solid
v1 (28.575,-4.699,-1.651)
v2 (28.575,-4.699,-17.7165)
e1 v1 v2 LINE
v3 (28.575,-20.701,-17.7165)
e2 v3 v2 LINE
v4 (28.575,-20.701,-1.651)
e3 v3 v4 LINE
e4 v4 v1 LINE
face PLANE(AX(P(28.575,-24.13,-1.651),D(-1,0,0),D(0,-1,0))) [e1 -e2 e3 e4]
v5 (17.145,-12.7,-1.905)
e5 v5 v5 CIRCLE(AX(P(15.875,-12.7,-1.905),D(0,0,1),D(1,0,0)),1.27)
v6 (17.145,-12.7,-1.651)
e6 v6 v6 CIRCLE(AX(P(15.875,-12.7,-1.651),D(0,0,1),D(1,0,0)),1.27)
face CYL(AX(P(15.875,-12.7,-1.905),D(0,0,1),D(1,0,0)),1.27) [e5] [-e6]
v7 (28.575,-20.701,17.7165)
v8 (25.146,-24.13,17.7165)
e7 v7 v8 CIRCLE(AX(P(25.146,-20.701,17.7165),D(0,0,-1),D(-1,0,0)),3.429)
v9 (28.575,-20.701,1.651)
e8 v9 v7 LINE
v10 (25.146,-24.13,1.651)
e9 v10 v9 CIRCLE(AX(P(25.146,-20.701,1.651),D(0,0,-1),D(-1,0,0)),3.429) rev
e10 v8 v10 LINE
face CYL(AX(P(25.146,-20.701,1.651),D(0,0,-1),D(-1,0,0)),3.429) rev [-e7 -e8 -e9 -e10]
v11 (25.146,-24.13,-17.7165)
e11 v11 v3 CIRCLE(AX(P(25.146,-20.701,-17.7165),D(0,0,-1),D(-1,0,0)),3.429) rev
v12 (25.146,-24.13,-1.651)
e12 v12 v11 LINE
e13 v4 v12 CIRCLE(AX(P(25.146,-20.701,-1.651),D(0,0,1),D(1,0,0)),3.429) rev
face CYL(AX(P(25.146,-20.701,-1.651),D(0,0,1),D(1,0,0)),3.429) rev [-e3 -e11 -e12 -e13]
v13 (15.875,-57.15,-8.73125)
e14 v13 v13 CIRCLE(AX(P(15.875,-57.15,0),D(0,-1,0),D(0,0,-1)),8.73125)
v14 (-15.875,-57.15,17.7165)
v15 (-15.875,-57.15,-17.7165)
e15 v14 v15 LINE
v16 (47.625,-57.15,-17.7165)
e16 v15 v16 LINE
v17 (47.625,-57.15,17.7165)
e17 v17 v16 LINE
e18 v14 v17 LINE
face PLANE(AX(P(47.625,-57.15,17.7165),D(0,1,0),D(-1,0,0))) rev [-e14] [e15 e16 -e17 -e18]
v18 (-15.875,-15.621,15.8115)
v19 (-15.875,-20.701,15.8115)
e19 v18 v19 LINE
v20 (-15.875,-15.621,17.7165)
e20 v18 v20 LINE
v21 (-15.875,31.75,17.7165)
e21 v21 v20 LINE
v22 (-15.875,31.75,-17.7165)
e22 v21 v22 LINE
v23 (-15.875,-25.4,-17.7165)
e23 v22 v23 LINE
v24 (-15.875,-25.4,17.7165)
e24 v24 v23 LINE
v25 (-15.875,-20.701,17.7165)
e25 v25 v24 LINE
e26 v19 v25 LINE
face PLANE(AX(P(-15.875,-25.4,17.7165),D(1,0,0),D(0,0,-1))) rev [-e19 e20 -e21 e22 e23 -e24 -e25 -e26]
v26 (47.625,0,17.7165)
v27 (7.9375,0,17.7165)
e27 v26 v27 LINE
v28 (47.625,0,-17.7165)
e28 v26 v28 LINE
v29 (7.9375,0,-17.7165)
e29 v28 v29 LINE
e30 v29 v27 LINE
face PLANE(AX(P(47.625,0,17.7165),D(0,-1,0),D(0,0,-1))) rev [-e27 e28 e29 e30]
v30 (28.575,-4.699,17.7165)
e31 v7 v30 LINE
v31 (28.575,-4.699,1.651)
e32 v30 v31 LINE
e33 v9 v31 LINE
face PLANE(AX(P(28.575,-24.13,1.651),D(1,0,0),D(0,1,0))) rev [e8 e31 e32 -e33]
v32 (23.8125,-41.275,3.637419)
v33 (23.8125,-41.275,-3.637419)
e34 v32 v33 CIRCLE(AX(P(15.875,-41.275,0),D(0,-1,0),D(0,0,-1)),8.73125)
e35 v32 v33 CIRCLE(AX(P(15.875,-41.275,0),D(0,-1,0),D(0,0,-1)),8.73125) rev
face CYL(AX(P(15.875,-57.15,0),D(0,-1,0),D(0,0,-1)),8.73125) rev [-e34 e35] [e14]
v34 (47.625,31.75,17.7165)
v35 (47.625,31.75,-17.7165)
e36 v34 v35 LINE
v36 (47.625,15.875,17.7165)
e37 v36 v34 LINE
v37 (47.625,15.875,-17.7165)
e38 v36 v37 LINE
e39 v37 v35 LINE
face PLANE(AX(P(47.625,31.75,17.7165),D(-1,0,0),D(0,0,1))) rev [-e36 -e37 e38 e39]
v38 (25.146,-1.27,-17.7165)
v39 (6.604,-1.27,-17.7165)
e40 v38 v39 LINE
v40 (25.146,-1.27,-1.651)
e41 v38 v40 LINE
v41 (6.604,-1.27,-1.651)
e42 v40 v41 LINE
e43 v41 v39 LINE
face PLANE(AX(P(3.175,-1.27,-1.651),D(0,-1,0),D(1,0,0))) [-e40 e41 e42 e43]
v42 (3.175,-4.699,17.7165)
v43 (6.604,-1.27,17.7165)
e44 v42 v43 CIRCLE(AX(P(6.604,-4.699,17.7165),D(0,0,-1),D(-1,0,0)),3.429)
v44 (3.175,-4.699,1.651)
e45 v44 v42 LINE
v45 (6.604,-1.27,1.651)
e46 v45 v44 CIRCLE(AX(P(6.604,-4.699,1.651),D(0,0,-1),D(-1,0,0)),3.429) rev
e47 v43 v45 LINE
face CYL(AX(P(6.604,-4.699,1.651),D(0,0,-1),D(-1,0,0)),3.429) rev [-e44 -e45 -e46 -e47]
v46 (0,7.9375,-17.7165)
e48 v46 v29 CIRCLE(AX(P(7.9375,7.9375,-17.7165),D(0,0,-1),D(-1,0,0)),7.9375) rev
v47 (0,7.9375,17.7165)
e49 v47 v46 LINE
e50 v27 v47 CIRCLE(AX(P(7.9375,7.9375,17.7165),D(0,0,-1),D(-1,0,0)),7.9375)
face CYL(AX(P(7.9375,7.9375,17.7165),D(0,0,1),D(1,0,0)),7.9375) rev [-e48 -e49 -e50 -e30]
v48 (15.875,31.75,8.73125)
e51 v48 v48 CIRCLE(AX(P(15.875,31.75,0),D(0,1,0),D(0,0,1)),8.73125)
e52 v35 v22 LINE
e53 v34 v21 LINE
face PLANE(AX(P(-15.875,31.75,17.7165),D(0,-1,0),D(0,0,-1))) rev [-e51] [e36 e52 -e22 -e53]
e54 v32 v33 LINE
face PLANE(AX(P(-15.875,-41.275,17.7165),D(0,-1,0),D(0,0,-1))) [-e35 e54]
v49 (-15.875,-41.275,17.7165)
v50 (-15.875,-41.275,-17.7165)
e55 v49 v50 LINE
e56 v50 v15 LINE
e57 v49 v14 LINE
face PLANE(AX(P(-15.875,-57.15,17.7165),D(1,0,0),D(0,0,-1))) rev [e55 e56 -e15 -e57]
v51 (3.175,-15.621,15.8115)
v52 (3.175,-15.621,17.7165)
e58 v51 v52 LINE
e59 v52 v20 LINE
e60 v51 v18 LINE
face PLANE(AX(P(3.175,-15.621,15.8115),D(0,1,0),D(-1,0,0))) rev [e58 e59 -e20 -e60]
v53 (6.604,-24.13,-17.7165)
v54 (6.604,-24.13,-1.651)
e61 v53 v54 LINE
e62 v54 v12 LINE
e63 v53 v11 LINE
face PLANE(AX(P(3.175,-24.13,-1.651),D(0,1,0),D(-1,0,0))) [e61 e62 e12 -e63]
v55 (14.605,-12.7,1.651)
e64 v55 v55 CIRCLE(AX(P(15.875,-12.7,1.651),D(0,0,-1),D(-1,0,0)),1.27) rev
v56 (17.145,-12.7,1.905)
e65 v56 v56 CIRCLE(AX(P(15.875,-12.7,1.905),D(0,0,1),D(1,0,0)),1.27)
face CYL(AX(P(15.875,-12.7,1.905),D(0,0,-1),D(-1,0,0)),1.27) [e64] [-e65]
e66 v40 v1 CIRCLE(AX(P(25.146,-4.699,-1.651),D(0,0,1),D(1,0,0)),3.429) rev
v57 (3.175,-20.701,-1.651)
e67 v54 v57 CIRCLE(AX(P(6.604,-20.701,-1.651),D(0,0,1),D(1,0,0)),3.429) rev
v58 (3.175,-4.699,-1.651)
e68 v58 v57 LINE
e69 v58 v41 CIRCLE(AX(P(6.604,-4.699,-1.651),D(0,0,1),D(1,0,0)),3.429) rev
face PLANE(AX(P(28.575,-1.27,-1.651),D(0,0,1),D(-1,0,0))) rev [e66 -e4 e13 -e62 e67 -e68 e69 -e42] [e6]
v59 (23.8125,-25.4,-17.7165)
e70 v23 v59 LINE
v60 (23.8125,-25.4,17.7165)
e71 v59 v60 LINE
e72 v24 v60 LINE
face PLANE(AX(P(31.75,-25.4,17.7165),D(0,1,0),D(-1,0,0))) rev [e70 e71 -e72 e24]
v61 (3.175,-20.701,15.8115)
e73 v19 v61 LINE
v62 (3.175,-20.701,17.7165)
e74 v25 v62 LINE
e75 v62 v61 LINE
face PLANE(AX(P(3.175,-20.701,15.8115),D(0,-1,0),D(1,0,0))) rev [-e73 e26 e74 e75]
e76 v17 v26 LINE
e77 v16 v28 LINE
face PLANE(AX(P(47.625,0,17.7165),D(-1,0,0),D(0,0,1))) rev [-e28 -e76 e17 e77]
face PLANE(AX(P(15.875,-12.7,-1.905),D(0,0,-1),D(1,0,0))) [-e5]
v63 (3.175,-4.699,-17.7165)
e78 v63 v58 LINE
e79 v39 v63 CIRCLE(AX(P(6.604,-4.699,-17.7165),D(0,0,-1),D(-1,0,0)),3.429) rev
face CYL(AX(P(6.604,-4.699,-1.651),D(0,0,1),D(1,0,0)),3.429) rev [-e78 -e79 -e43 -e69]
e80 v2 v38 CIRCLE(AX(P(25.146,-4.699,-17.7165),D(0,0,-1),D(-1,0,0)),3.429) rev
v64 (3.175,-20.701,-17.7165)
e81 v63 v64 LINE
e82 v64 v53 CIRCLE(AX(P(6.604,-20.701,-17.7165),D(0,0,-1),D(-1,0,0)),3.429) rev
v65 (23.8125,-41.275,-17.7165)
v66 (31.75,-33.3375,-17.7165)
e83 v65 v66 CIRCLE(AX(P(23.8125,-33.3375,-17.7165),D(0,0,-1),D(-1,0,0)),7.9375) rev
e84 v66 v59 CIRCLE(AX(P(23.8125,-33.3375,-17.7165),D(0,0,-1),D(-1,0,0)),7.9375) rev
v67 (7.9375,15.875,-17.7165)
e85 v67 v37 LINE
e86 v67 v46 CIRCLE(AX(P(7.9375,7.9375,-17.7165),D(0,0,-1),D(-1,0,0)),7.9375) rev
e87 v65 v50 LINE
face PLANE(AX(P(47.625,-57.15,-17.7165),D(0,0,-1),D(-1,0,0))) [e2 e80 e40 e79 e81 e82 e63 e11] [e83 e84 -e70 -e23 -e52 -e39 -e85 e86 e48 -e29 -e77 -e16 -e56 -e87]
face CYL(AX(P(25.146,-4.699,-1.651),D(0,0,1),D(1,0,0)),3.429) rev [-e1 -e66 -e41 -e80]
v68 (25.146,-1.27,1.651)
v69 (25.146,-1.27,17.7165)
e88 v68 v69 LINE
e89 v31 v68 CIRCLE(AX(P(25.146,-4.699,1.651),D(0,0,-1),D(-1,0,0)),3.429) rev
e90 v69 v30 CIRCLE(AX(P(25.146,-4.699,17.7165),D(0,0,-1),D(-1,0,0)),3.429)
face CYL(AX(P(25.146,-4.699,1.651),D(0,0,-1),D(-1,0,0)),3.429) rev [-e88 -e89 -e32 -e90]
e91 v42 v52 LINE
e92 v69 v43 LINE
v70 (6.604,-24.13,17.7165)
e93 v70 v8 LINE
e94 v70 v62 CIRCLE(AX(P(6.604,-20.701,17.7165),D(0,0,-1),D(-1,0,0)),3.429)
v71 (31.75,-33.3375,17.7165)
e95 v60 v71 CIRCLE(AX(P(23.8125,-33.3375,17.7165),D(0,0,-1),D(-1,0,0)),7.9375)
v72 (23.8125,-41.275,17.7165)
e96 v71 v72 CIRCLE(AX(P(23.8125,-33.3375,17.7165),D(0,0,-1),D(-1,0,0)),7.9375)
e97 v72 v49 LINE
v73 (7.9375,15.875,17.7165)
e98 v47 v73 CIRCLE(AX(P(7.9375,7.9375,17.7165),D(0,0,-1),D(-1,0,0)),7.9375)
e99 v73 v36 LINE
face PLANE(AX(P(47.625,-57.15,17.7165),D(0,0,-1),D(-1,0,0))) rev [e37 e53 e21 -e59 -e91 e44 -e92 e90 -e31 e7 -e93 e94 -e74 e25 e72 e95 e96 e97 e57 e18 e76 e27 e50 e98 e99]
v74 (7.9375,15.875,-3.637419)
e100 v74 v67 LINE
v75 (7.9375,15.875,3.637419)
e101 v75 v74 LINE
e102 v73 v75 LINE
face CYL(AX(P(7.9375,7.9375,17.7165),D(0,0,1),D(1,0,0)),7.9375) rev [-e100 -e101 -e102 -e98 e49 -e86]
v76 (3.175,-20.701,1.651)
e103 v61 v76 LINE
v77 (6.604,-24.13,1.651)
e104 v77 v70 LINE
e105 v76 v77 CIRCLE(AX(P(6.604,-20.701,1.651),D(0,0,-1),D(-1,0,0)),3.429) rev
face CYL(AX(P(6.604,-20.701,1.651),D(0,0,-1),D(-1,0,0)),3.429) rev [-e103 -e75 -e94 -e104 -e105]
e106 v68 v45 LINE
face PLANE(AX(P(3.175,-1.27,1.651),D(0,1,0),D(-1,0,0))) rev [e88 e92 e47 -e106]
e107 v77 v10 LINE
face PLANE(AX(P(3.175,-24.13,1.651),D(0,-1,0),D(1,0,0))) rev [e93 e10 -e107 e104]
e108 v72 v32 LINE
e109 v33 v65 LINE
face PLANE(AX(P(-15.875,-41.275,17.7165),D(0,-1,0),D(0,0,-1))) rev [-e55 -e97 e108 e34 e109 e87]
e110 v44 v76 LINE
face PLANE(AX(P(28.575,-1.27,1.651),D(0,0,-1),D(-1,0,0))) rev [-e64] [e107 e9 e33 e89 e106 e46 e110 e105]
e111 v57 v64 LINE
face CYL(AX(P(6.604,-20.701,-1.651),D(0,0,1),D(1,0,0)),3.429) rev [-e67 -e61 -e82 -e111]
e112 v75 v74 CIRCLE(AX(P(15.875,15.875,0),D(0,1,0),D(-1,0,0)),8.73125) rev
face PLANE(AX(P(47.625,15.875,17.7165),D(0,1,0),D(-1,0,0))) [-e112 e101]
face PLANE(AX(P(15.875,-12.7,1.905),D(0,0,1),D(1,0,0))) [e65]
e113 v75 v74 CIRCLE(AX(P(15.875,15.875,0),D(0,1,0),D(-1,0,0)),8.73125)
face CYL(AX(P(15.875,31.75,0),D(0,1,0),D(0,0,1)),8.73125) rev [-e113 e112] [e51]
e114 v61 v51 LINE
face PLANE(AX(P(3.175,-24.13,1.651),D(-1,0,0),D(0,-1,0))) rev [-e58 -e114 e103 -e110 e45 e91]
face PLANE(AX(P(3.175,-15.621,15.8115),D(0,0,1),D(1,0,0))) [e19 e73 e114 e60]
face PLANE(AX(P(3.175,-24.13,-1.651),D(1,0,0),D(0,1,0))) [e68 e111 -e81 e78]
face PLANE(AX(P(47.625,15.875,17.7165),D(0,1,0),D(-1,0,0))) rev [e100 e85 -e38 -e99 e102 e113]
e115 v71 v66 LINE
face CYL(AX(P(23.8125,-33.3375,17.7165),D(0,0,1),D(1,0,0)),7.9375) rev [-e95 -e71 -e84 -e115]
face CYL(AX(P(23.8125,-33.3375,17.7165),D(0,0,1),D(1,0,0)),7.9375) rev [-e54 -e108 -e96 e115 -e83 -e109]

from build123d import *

# Parameters (mm, degrees)
BOSS_EXTRUDE1_DEPTH         = 17.7165
FILLET1_R                   = 7.9375
F_3_4_16_TAPPED_HOLE1_D     = 17.4625
F_3_4_16_TAPPED_HOLE1_DEPTH = 15.875
F_3_4_16_TAPPED_HOLE2_D     = 17.4625
F_3_4_16_TAPPED_HOLE2_DEPTH = 15.875
SKETCH8_W                   = 25.4
SKETCH8_H                   = 22.86
CUT_EXTRUDE1_DEPTH          = 16.0655
FILLET2_R                   = 3.429
FILLET2_OF_MIRROR1_R        = 3.429
SKETCH10_R                  = 1.27
BOSS_EXTRUDE2_DEPTH         = 0.254
SKETCH15_W                  = 19.05
SKETCH15_H                  = 5.08
CUT_EXTRUDE2_DEPTH          = 1.905


with BuildPart() as part:
    # Sketch1 → Boss-Extrude1 (new, symmetric)
    with BuildSketch(Plane.XY):
        Polygon((47.625, 0), (0, 0), (0, 15.875), (47.625, 15.875), (47.625, 31.75), (-15.875, 31.75), (-15.875, -25.4), (31.75, -25.4), (31.75, -41.275), (-15.875, -41.275), (-15.875, -57.15), (47.625, -57.15), align=None)
    extrude(amount=BOSS_EXTRUDE1_DEPTH, both=True)

    # Fillet1
    fillet1_edges = [part.edges().sort_by_distance(p)[0] for p in [
        (31.75, -41.275, 0),
        (31.75, -25.4, 0),
        (0, 15.875, 0),
        (0, 0, 0),
    ]]
    fillet(fillet1_edges, radius=FILLET1_R - 0.0001)  # a hair under: the kernel refuses the full size

    # 3/4-16 Tapped Hole1
    with Locations(Plane.XZ.offset(57.15)):
        with Locations((15.875, 0)):
            Hole(F_3_4_16_TAPPED_HOLE1_D / 2, depth=F_3_4_16_TAPPED_HOLE1_DEPTH)

    # 3/4-16 Tapped Hole2
    with Locations(Plane(origin=(0, 31.75, 0), x_dir=(-1, 0, 0), z_dir=(0, 1, 0))):
        with Locations((-15.875, 0)):
            Hole(F_3_4_16_TAPPED_HOLE2_D / 2, depth=F_3_4_16_TAPPED_HOLE2_DEPTH)

    # Sketch8 → Cut-Extrude1 (cut)
    with BuildSketch(Plane.XY.offset(17.7165)):
        with Locations((15.875, -12.7)):
            Rectangle(SKETCH8_W, SKETCH8_H)
    cut_extrude1 = extrude(amount=-CUT_EXTRUDE1_DEPTH, mode=Mode.SUBTRACT)

    # Fillet2
    fillet2_edges = [part.edges().sort_by_distance(p)[0] for p in [
        (28.575, -1.27, 9.68375),
        (28.575, -24.13, 9.68375),
        (3.175, -24.13, 9.68375),
        (3.175, -1.27, 9.68375),
    ]]
    fillet(fillet2_edges, radius=FILLET2_R)

    # Mirror1: Cut-Extrude1 across plane
    add(cut_extrude1.mirror(Plane.XY), mode=Mode.SUBTRACT)

    # Fillet2 of Mirror1
    fillet2_of_mirror1_edges = [part.edges().sort_by_distance(p)[0] for p in [
        (28.575, -1.27, -9.68375),
        (28.575, -24.13, -9.68375),
        (3.175, -24.13, -9.68375),
        (3.175, -1.27, -9.68375),
    ]]
    fillet(fillet2_of_mirror1_edges, radius=FILLET2_OF_MIRROR1_R)

    # Sketch10 → Boss-Extrude2 (add)
    with BuildSketch(Plane.XY.offset(1.651)):
        with Locations(Location((15.875, -12.7, 0), (0, 0, 180))):
            Circle(SKETCH10_R)
    boss_extrude2 = extrude(amount=BOSS_EXTRUDE2_DEPTH)

    # Mirror2: Boss-Extrude2 across plane
    add(boss_extrude2.mirror(Plane.XY))

    # Sketch15 → Cut-Extrude2 (cut)
    with BuildSketch(Plane.XY.offset(17.7165)):
        with Locations((-6.35, -18.161)):
            Rectangle(SKETCH15_W, SKETCH15_H)
    extrude(amount=-CUT_EXTRUDE2_DEPTH, mode=Mode.SUBTRACT)


solid = part.part
